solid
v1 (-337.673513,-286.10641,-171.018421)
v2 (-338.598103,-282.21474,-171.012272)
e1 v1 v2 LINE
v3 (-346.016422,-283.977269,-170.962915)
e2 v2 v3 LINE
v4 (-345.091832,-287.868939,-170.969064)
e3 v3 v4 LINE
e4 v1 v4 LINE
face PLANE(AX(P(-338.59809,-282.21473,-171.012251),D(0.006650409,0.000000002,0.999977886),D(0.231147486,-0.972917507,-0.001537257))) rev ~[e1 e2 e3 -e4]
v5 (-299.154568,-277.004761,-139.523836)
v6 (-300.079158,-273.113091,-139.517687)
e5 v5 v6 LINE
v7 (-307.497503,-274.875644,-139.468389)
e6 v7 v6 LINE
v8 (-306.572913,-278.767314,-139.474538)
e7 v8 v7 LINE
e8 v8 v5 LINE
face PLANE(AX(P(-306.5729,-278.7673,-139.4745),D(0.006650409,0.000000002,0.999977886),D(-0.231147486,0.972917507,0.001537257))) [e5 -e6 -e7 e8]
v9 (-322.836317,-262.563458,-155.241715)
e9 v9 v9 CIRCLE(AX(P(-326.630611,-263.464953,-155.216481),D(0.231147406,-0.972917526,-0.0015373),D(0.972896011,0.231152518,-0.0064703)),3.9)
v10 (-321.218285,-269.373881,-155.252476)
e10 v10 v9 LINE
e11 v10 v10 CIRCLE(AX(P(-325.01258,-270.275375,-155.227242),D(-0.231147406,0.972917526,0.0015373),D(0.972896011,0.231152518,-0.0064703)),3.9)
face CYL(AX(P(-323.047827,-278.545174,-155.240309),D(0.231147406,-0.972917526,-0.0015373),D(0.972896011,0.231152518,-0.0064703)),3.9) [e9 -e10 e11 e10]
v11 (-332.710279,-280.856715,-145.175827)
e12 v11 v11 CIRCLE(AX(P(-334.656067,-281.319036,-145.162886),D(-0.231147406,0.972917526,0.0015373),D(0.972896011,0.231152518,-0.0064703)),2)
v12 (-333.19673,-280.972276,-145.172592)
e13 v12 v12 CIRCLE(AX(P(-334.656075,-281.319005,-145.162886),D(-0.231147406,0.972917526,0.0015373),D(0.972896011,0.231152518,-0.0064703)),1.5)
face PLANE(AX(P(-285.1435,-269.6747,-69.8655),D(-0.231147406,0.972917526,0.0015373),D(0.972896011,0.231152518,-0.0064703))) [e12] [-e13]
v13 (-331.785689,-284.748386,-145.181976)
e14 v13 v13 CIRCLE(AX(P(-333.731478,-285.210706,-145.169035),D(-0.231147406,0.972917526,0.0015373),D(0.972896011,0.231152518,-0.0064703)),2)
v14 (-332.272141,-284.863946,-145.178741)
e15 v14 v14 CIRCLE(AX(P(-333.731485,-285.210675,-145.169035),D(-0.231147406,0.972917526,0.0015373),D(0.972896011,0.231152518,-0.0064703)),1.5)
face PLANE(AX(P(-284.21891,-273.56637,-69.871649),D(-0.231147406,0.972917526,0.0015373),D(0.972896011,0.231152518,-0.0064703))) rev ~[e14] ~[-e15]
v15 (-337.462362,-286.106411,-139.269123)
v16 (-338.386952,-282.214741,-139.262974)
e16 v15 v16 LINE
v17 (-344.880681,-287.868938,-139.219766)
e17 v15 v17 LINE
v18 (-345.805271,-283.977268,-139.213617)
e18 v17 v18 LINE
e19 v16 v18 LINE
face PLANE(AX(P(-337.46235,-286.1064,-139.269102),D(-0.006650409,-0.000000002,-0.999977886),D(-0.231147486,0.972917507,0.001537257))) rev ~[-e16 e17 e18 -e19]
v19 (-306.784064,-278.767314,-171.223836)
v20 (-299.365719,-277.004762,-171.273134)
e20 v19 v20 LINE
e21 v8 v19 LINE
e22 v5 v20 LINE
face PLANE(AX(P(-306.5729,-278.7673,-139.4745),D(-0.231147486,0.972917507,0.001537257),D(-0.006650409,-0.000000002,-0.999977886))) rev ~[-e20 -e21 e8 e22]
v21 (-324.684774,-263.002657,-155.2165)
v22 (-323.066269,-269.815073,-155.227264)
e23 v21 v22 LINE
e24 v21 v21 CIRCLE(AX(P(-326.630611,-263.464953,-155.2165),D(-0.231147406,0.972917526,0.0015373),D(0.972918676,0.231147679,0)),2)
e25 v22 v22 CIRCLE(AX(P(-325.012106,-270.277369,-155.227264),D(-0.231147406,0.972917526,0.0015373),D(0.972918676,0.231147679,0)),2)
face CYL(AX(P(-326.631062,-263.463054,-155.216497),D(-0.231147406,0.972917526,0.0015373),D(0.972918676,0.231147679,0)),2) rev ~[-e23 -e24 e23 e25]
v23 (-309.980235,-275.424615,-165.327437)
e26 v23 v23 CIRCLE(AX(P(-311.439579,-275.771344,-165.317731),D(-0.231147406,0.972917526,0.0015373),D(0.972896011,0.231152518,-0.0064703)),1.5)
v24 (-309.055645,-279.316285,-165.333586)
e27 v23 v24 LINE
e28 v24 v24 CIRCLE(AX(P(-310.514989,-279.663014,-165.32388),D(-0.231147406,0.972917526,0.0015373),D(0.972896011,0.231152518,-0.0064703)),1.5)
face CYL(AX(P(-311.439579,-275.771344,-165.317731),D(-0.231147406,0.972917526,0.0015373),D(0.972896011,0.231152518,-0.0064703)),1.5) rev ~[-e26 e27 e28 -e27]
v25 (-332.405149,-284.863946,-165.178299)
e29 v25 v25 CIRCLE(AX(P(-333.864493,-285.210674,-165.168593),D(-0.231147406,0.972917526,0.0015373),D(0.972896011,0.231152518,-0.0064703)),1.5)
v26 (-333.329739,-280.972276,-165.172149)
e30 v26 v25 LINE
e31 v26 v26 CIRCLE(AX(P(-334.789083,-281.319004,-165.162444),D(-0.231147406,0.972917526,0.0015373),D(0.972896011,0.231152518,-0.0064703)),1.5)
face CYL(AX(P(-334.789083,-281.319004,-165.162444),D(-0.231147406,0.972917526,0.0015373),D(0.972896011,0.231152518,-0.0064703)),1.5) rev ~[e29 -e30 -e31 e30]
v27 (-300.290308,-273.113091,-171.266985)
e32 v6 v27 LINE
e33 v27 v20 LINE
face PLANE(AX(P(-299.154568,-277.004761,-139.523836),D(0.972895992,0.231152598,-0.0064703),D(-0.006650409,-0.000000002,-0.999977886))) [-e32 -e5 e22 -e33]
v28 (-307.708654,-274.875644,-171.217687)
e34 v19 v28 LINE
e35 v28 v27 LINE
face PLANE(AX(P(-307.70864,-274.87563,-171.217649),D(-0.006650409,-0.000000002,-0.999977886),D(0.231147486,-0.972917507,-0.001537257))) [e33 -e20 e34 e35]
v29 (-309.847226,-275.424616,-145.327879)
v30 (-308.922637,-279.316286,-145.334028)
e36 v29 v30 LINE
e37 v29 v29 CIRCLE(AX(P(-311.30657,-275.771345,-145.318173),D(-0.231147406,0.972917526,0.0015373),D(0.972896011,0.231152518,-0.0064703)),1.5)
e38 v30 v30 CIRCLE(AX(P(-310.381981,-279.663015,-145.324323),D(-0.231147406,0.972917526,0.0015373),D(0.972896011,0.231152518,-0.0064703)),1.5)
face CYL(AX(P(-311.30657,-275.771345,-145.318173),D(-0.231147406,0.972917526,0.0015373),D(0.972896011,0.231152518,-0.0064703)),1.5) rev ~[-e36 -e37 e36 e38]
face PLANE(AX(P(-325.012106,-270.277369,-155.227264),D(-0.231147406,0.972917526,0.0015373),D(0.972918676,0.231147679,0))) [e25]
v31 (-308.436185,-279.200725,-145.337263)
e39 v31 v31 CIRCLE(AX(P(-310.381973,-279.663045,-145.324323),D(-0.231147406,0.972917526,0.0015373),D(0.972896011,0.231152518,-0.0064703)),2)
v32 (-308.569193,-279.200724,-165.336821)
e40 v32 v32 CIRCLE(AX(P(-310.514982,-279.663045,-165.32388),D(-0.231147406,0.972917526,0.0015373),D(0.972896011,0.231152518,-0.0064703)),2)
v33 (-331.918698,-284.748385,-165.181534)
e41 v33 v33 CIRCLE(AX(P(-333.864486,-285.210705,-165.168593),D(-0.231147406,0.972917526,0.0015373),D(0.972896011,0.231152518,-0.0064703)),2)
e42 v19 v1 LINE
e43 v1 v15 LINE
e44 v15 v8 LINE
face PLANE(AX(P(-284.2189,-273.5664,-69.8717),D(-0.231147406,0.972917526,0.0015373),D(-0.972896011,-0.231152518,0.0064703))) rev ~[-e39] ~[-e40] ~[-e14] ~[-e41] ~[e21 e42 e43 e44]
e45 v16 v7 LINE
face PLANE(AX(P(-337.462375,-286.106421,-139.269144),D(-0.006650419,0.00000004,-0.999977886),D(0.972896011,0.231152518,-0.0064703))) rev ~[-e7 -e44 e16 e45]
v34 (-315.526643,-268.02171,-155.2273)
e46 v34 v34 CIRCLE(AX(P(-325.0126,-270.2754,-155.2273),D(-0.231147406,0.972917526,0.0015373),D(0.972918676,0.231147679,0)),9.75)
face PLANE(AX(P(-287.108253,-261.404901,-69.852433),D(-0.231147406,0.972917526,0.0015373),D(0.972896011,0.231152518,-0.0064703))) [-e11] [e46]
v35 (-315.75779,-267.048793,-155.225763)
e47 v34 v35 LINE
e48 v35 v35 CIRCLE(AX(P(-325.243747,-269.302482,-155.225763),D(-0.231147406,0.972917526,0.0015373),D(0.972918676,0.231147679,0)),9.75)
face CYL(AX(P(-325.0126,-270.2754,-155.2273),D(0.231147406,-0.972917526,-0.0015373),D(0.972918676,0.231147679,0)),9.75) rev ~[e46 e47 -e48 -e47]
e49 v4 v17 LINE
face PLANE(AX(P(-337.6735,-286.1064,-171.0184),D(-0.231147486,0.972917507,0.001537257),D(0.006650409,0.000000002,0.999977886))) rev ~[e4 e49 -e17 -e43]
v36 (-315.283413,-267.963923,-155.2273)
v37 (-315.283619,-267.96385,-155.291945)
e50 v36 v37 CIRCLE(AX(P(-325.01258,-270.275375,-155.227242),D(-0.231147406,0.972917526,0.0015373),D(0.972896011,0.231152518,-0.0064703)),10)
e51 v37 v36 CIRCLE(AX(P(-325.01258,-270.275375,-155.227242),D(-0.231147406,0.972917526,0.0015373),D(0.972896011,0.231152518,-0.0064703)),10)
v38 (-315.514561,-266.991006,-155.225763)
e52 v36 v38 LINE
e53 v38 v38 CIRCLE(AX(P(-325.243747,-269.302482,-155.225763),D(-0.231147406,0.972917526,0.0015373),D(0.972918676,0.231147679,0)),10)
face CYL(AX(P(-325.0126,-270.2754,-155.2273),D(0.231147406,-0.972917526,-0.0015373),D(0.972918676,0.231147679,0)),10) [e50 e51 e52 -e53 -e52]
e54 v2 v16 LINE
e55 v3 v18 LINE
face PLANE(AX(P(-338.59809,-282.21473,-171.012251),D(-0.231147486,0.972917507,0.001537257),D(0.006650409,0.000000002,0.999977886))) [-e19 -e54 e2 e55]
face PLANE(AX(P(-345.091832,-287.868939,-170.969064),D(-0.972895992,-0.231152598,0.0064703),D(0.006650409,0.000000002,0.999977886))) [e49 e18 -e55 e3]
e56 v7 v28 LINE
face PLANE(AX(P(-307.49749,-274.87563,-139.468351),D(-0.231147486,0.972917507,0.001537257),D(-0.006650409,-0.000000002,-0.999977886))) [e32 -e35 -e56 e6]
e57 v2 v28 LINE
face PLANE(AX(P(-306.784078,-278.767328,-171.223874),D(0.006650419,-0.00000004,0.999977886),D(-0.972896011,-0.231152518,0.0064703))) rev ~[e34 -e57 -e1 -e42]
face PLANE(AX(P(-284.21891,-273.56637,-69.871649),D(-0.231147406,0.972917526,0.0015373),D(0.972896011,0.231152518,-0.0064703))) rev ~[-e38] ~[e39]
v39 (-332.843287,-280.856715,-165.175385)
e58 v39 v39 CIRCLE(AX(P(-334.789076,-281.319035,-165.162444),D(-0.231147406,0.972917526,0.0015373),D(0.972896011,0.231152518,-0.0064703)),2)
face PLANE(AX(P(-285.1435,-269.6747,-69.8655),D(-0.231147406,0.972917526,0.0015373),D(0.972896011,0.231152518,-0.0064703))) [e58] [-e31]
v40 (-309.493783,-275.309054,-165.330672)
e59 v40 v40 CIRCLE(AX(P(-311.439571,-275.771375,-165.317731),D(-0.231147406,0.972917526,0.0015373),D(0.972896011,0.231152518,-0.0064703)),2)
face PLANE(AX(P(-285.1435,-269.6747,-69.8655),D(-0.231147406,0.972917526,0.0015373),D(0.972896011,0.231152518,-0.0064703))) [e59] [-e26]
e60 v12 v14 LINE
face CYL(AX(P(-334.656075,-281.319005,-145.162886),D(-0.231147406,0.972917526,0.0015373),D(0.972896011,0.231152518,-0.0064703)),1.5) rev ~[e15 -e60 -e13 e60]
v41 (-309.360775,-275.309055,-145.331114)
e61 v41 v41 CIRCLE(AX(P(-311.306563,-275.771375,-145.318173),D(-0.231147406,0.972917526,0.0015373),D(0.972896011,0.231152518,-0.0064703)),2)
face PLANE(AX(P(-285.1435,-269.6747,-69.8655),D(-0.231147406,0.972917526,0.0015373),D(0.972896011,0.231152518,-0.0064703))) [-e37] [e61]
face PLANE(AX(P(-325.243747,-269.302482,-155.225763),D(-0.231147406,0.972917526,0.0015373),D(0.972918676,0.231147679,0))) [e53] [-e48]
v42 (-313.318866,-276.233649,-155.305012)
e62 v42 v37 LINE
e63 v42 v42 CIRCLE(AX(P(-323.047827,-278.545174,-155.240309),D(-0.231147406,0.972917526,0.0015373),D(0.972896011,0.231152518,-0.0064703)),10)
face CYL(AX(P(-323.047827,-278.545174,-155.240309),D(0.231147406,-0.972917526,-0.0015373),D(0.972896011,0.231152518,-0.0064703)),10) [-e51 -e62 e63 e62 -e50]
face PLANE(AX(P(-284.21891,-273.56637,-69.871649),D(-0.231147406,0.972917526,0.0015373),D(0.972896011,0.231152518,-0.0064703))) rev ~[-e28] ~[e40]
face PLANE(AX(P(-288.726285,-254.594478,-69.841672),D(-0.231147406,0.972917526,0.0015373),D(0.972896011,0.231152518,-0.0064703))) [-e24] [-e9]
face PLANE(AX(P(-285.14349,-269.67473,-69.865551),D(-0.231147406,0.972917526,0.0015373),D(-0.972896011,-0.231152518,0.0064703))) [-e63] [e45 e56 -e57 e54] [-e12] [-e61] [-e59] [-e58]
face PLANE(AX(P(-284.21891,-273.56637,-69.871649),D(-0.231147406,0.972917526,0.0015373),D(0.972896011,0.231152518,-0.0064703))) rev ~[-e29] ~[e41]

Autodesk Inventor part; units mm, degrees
ref_plane "РабПлоскость1" through (-284.2189, -273.5664, -69.8717) normal (-0.2311474, 0.9729175, 0.0015373) x (-0.972896, -0.2311526, 0.0064703)
sketch "Эскиз1" plane through (-284.2189, -273.5664, -69.8717) normal (-0.2311474, 0.9729175, 0.0015373) x (-0.972896, -0.2311526, 0.0064703)
  line L0 (22.5, -101.5) -> (54.25, -101.5)
  line L1 (54.25, -101.5) -> (54.25, -69.75)
  line L2 (54.25, -69.75) -> (22.5, -69.75)
  line L3 (22.5, -69.75) -> (22.5, -101.5)
  circle A0 centre (38.375, -85.625) radius 15.75 projected
  line L4 (38.375, -101.375) -> (38.375, -107.7067)
  point P0 (-339.2989, 71.7603)
  point P1 (22.5, -91.5)
  point P2 (38.375, -101.375)
  point P3 (38.375, -102.625)
  dimension "d0" = 31.75
  dimension "d1" = 31.75
extrude "Выдавливание1" add sketch "Эскиз1" along normal blind 4 contours L3 L2 L1 L0 | A0
sketch "Эскиз2" plane through (-285.1435, -269.6747, -69.8655) normal (-0.2311474, 0.9729175, 0.0015373) x (0.972896, 0.2311526, -0.0064703)
  line L0 (-54.25, 101.5) -> (-54.25, 69.75) projected
  line L1 (-54.25, 85.625) -> (-22.5, 85.625)
  line L2 (-22.5, 69.75) -> (-22.5, 101.5) projected
  line L3 (-54.25, 69.75) -> (-22.5, 69.75) projected
  line L4 (-50.375, 85.625) -> (-50.375, 101.5)
  line L5 (-36.5891, 93.625) -> (-22.5, 93.625)
  line L6 (-36.5891, 93.625) -> (-54.25, 93.625)
  line L7 (-50.375, 85.625) -> (-50.375, 68.9602)
  line L8 (-50.375, 75.625) -> (-22.5, 75.625)
  line L9 (-26.375, 103.5) -> (-26.375, 69.75)
  circle A0 centre (-50.375, 75.625) radius 2
  circle A1 centre (-26.375, 75.625) radius 2
  line L10 (-38.375, 72.7459) -> (-38.375, 103.5)
  line L11 (-38.375, 72.7459) -> (-38.375, 69.75)
  point P0 (339.2989, -71.7603)
  point P1 (-49.5, 101.5)
  point P2 (-38.375, 101.5)
  point P3 (-22.5, 85.625)
  point P4 (-54.25, 101.5)
  dimension "d5" = 8
  dimension "d6" = 12
  dimension "d7" = 10
  dimension "d8" = 4
  dimension "d9" = 4
  dimension "d16" = 12
sketch "Эскиз3" plane through (-285.1435, -269.6747, -69.8655) normal (-0.2311474, 0.9729175, 0.0015373) x (0.972896, 0.2311526, -0.0064703)
  circle A0 centre (-50.375, 95.625) radius 2
  circle A1 centre (-26.375, 95.625) radius 2
  line L0 (-54.25, 69.75) -> (-22.5, 69.75) projected
  line L1 (-38.375, 69.75) -> (-38.375, 101.5)
  line L2 (-38.375, 101.5) -> (-54.25, 85.625)
  line L3 (-54.25, 85.625) -> (-22.5, 85.625)
  point P0 (339.2989, -71.7603)
  point P1 (-50.375, 93.5625)
  dimension "d10" = 4
  dimension "d11" = 4
  dimension "d17" = 7.9375
  dimension "d18" = 15.875
  dimension "d19" = 10
  dimension "d20" = 10
  dimension "d21" = 12
extrude "Выдавливание2" cut sketch "Эскиз3" against normal blind 10 contours A0 | A1
extrude "Выдавливание3" cut sketch "Эскиз2" against normal blind 10 contours A0 L8 L7 | L7 A0 | L7 L8 A0 | A1 L8 L9 | L9 L8 A1 | L8 L9 A1 | L9 L8 A1
sketch "Эскиз4" plane through (-285.1435, -269.6747, -69.8655) normal (-0.2311474, 0.9729175, 0.0015373) x (0.972896, 0.2311526, -0.0064703)
  line L0 (-54.25, 101.5) -> (-54.25, 69.75) projected
  line L1 (-54.25, 85.625) -> (-22.5, 85.625)
  line L2 (-22.5, 69.75) -> (-22.5, 101.5) projected
  line L3 (-38.375, 101.5) -> (-38.375, 69.75)
  line L4 (-54.25, 69.75) -> (-22.5, 69.75) projected
  circle A0 centre (-38.375, 85.625) radius 3.9
  point P0 (339.2989, -71.7603)
  dimension "d22" = 7.8
extrude "Выдавливание4" add sketch "Эскиз4" along normal blind 15.5 contours A0 L3 L1 | L1 L3 A0 | L3 A0 L1 | L1 A0 L3
sketch "Эскиз5" plane through (-326.6306, -263.465, -155.2165) normal (-0.2311474, 0.9729175, 0.0015373) x (0.9729187, 0.2311477, 0)
  circle A0 centre (0, 0) radius 2
  point P0 (378.6843, -154.9383)
  dimension "d25" = 4
extrude "Выдавливание5" cut sketch "Эскиз5" against normal blind 7
thread "Резьба1" size "M4x0.7" class "6H" standard "ANSI Metric M Profile" full length
sketch "Эскиз6" plane through (-337.6735, -286.1064, -171.0184) normal (-0.972896, -0.2311526, 0.0064703) x (0.0066504, 0, 0.9999779)
  line L0 (0, 4) -> (31.75, 4) projected
  line L1 (31.75, 4) -> (0, 4)
  line L2 (0, 4) -> (0, 0)
  line L3 (0, 0) -> (31.75, 0)
  line L4 (31.75, 0) -> (31.75, 4)
  point P0 (173.2603, 200.5685)
  point P1 (0, 4)
ref_plane "РабПлоскость2" through (-345.4521, -286.2315, -166.64) normal (0.972896, 0.2311526, -0.0064703) x (-0.2311474, 0.9729175, 0.0015373)
extrude "Выдавливание6" add sketch "Эскиз6" along normal up to surface (7.625 mm away)
sketch "Эскиз7" plane through (-306.5729, -278.7673, -139.4745) normal (0.972896, 0.2311526, -0.0064703) x (-0.0066504, 0, -0.9999779)
  line L0 (0, 0) -> (31.75, 0) projected
  line L1 (0, 4) -> (31.75, 4) projected
  line L2 (31.75, 0) -> (0, 0)
  line L3 (0, 0) -> (0, 4)
  line L4 (0, 4) -> (31.75, 4)
  line L5 (31.75, 4) -> (31.75, 0)
  point P0 (-141.5103, 200.5685)
  point P1 (31.75, 4)
ref_plane "РабПлоскость3" through (-299.726, -275.3674, -166.9441) normal (-0.972896, -0.2311526, 0.0064703) x (0.0066504, 0, 0.9999779)
extrude "Выдавливание7" add sketch "Эскиз7" along normal up to surface (7.625 mm away)
sketch "Эскиз8" plane through (-285.1435, -269.6747, -69.8655) normal (-0.2311474, 0.9729175, 0.0015373) x (0.972896, 0.2311526, -0.0064703)
  circle A0 centre (-38.375, 85.625) radius 3.9 projected
  circle A1 centre (-38.375, 85.625) radius 10
  point P0 (339.2989, -71.7603)
  dimension "d34" = 20
extrude "Выдавливание8" add sketch "Эскиз8" along normal blind 8.5
sketch "Эскиз9" plane through (-285.1435, -269.6747, -69.8655) normal (-0.2311474, 0.9729175, 0.0015373) x (0.972896, 0.2311526, -0.0064703)
  circle A0 centre (-26.375, 75.625) radius 2 projected
  circle A1 centre (-26.375, 95.625) radius 2 projected
  circle A2 centre (-50.375, 75.625) radius 2 projected
  circle A3 centre (-50.375, 95.625) radius 2 projected
  circle A4 centre (-26.375, 75.625) radius 1.5
  circle A5 centre (-26.375, 95.625) radius 1.5
  circle A6 centre (-50.375, 95.625) radius 1.5
  circle A7 centre (-50.375, 75.625) radius 1.5
  point P0 (339.2989, -71.7603)
  dimension "d37" = 3
  dimension "d38" = 3
  dimension "d39" = 3
  dimension "d40" = 3
ref_plane "РабПлоскость4" through (-375.5638, -295.1043, -173.6384) normal (-0.2311474, 0.9729175, 0.0015373) x (0.0066504, 0, 0.9999779)
extrude "Выдавливание9" add sketch "Эскиз9" against normal up to surface (4 mm away)
sketch "Эскиз10" plane through (-325.0126, -270.2754, -155.2273) normal (-0.2311474, 0.9729175, 0.0015373) x (0.9729187, 0.2311477, 0)
  circle A0 centre (0, 0) radius 9.75
  circle A1 centre (0, 0) radius 10
  point P0 (378.6843, -154.9383)
  dimension "d43" = 20
  dimension "d44" = 19.5
extrude "Выдавливание10" add sketch "Эскиз10" along normal blind 1
properties part number "ступица"
